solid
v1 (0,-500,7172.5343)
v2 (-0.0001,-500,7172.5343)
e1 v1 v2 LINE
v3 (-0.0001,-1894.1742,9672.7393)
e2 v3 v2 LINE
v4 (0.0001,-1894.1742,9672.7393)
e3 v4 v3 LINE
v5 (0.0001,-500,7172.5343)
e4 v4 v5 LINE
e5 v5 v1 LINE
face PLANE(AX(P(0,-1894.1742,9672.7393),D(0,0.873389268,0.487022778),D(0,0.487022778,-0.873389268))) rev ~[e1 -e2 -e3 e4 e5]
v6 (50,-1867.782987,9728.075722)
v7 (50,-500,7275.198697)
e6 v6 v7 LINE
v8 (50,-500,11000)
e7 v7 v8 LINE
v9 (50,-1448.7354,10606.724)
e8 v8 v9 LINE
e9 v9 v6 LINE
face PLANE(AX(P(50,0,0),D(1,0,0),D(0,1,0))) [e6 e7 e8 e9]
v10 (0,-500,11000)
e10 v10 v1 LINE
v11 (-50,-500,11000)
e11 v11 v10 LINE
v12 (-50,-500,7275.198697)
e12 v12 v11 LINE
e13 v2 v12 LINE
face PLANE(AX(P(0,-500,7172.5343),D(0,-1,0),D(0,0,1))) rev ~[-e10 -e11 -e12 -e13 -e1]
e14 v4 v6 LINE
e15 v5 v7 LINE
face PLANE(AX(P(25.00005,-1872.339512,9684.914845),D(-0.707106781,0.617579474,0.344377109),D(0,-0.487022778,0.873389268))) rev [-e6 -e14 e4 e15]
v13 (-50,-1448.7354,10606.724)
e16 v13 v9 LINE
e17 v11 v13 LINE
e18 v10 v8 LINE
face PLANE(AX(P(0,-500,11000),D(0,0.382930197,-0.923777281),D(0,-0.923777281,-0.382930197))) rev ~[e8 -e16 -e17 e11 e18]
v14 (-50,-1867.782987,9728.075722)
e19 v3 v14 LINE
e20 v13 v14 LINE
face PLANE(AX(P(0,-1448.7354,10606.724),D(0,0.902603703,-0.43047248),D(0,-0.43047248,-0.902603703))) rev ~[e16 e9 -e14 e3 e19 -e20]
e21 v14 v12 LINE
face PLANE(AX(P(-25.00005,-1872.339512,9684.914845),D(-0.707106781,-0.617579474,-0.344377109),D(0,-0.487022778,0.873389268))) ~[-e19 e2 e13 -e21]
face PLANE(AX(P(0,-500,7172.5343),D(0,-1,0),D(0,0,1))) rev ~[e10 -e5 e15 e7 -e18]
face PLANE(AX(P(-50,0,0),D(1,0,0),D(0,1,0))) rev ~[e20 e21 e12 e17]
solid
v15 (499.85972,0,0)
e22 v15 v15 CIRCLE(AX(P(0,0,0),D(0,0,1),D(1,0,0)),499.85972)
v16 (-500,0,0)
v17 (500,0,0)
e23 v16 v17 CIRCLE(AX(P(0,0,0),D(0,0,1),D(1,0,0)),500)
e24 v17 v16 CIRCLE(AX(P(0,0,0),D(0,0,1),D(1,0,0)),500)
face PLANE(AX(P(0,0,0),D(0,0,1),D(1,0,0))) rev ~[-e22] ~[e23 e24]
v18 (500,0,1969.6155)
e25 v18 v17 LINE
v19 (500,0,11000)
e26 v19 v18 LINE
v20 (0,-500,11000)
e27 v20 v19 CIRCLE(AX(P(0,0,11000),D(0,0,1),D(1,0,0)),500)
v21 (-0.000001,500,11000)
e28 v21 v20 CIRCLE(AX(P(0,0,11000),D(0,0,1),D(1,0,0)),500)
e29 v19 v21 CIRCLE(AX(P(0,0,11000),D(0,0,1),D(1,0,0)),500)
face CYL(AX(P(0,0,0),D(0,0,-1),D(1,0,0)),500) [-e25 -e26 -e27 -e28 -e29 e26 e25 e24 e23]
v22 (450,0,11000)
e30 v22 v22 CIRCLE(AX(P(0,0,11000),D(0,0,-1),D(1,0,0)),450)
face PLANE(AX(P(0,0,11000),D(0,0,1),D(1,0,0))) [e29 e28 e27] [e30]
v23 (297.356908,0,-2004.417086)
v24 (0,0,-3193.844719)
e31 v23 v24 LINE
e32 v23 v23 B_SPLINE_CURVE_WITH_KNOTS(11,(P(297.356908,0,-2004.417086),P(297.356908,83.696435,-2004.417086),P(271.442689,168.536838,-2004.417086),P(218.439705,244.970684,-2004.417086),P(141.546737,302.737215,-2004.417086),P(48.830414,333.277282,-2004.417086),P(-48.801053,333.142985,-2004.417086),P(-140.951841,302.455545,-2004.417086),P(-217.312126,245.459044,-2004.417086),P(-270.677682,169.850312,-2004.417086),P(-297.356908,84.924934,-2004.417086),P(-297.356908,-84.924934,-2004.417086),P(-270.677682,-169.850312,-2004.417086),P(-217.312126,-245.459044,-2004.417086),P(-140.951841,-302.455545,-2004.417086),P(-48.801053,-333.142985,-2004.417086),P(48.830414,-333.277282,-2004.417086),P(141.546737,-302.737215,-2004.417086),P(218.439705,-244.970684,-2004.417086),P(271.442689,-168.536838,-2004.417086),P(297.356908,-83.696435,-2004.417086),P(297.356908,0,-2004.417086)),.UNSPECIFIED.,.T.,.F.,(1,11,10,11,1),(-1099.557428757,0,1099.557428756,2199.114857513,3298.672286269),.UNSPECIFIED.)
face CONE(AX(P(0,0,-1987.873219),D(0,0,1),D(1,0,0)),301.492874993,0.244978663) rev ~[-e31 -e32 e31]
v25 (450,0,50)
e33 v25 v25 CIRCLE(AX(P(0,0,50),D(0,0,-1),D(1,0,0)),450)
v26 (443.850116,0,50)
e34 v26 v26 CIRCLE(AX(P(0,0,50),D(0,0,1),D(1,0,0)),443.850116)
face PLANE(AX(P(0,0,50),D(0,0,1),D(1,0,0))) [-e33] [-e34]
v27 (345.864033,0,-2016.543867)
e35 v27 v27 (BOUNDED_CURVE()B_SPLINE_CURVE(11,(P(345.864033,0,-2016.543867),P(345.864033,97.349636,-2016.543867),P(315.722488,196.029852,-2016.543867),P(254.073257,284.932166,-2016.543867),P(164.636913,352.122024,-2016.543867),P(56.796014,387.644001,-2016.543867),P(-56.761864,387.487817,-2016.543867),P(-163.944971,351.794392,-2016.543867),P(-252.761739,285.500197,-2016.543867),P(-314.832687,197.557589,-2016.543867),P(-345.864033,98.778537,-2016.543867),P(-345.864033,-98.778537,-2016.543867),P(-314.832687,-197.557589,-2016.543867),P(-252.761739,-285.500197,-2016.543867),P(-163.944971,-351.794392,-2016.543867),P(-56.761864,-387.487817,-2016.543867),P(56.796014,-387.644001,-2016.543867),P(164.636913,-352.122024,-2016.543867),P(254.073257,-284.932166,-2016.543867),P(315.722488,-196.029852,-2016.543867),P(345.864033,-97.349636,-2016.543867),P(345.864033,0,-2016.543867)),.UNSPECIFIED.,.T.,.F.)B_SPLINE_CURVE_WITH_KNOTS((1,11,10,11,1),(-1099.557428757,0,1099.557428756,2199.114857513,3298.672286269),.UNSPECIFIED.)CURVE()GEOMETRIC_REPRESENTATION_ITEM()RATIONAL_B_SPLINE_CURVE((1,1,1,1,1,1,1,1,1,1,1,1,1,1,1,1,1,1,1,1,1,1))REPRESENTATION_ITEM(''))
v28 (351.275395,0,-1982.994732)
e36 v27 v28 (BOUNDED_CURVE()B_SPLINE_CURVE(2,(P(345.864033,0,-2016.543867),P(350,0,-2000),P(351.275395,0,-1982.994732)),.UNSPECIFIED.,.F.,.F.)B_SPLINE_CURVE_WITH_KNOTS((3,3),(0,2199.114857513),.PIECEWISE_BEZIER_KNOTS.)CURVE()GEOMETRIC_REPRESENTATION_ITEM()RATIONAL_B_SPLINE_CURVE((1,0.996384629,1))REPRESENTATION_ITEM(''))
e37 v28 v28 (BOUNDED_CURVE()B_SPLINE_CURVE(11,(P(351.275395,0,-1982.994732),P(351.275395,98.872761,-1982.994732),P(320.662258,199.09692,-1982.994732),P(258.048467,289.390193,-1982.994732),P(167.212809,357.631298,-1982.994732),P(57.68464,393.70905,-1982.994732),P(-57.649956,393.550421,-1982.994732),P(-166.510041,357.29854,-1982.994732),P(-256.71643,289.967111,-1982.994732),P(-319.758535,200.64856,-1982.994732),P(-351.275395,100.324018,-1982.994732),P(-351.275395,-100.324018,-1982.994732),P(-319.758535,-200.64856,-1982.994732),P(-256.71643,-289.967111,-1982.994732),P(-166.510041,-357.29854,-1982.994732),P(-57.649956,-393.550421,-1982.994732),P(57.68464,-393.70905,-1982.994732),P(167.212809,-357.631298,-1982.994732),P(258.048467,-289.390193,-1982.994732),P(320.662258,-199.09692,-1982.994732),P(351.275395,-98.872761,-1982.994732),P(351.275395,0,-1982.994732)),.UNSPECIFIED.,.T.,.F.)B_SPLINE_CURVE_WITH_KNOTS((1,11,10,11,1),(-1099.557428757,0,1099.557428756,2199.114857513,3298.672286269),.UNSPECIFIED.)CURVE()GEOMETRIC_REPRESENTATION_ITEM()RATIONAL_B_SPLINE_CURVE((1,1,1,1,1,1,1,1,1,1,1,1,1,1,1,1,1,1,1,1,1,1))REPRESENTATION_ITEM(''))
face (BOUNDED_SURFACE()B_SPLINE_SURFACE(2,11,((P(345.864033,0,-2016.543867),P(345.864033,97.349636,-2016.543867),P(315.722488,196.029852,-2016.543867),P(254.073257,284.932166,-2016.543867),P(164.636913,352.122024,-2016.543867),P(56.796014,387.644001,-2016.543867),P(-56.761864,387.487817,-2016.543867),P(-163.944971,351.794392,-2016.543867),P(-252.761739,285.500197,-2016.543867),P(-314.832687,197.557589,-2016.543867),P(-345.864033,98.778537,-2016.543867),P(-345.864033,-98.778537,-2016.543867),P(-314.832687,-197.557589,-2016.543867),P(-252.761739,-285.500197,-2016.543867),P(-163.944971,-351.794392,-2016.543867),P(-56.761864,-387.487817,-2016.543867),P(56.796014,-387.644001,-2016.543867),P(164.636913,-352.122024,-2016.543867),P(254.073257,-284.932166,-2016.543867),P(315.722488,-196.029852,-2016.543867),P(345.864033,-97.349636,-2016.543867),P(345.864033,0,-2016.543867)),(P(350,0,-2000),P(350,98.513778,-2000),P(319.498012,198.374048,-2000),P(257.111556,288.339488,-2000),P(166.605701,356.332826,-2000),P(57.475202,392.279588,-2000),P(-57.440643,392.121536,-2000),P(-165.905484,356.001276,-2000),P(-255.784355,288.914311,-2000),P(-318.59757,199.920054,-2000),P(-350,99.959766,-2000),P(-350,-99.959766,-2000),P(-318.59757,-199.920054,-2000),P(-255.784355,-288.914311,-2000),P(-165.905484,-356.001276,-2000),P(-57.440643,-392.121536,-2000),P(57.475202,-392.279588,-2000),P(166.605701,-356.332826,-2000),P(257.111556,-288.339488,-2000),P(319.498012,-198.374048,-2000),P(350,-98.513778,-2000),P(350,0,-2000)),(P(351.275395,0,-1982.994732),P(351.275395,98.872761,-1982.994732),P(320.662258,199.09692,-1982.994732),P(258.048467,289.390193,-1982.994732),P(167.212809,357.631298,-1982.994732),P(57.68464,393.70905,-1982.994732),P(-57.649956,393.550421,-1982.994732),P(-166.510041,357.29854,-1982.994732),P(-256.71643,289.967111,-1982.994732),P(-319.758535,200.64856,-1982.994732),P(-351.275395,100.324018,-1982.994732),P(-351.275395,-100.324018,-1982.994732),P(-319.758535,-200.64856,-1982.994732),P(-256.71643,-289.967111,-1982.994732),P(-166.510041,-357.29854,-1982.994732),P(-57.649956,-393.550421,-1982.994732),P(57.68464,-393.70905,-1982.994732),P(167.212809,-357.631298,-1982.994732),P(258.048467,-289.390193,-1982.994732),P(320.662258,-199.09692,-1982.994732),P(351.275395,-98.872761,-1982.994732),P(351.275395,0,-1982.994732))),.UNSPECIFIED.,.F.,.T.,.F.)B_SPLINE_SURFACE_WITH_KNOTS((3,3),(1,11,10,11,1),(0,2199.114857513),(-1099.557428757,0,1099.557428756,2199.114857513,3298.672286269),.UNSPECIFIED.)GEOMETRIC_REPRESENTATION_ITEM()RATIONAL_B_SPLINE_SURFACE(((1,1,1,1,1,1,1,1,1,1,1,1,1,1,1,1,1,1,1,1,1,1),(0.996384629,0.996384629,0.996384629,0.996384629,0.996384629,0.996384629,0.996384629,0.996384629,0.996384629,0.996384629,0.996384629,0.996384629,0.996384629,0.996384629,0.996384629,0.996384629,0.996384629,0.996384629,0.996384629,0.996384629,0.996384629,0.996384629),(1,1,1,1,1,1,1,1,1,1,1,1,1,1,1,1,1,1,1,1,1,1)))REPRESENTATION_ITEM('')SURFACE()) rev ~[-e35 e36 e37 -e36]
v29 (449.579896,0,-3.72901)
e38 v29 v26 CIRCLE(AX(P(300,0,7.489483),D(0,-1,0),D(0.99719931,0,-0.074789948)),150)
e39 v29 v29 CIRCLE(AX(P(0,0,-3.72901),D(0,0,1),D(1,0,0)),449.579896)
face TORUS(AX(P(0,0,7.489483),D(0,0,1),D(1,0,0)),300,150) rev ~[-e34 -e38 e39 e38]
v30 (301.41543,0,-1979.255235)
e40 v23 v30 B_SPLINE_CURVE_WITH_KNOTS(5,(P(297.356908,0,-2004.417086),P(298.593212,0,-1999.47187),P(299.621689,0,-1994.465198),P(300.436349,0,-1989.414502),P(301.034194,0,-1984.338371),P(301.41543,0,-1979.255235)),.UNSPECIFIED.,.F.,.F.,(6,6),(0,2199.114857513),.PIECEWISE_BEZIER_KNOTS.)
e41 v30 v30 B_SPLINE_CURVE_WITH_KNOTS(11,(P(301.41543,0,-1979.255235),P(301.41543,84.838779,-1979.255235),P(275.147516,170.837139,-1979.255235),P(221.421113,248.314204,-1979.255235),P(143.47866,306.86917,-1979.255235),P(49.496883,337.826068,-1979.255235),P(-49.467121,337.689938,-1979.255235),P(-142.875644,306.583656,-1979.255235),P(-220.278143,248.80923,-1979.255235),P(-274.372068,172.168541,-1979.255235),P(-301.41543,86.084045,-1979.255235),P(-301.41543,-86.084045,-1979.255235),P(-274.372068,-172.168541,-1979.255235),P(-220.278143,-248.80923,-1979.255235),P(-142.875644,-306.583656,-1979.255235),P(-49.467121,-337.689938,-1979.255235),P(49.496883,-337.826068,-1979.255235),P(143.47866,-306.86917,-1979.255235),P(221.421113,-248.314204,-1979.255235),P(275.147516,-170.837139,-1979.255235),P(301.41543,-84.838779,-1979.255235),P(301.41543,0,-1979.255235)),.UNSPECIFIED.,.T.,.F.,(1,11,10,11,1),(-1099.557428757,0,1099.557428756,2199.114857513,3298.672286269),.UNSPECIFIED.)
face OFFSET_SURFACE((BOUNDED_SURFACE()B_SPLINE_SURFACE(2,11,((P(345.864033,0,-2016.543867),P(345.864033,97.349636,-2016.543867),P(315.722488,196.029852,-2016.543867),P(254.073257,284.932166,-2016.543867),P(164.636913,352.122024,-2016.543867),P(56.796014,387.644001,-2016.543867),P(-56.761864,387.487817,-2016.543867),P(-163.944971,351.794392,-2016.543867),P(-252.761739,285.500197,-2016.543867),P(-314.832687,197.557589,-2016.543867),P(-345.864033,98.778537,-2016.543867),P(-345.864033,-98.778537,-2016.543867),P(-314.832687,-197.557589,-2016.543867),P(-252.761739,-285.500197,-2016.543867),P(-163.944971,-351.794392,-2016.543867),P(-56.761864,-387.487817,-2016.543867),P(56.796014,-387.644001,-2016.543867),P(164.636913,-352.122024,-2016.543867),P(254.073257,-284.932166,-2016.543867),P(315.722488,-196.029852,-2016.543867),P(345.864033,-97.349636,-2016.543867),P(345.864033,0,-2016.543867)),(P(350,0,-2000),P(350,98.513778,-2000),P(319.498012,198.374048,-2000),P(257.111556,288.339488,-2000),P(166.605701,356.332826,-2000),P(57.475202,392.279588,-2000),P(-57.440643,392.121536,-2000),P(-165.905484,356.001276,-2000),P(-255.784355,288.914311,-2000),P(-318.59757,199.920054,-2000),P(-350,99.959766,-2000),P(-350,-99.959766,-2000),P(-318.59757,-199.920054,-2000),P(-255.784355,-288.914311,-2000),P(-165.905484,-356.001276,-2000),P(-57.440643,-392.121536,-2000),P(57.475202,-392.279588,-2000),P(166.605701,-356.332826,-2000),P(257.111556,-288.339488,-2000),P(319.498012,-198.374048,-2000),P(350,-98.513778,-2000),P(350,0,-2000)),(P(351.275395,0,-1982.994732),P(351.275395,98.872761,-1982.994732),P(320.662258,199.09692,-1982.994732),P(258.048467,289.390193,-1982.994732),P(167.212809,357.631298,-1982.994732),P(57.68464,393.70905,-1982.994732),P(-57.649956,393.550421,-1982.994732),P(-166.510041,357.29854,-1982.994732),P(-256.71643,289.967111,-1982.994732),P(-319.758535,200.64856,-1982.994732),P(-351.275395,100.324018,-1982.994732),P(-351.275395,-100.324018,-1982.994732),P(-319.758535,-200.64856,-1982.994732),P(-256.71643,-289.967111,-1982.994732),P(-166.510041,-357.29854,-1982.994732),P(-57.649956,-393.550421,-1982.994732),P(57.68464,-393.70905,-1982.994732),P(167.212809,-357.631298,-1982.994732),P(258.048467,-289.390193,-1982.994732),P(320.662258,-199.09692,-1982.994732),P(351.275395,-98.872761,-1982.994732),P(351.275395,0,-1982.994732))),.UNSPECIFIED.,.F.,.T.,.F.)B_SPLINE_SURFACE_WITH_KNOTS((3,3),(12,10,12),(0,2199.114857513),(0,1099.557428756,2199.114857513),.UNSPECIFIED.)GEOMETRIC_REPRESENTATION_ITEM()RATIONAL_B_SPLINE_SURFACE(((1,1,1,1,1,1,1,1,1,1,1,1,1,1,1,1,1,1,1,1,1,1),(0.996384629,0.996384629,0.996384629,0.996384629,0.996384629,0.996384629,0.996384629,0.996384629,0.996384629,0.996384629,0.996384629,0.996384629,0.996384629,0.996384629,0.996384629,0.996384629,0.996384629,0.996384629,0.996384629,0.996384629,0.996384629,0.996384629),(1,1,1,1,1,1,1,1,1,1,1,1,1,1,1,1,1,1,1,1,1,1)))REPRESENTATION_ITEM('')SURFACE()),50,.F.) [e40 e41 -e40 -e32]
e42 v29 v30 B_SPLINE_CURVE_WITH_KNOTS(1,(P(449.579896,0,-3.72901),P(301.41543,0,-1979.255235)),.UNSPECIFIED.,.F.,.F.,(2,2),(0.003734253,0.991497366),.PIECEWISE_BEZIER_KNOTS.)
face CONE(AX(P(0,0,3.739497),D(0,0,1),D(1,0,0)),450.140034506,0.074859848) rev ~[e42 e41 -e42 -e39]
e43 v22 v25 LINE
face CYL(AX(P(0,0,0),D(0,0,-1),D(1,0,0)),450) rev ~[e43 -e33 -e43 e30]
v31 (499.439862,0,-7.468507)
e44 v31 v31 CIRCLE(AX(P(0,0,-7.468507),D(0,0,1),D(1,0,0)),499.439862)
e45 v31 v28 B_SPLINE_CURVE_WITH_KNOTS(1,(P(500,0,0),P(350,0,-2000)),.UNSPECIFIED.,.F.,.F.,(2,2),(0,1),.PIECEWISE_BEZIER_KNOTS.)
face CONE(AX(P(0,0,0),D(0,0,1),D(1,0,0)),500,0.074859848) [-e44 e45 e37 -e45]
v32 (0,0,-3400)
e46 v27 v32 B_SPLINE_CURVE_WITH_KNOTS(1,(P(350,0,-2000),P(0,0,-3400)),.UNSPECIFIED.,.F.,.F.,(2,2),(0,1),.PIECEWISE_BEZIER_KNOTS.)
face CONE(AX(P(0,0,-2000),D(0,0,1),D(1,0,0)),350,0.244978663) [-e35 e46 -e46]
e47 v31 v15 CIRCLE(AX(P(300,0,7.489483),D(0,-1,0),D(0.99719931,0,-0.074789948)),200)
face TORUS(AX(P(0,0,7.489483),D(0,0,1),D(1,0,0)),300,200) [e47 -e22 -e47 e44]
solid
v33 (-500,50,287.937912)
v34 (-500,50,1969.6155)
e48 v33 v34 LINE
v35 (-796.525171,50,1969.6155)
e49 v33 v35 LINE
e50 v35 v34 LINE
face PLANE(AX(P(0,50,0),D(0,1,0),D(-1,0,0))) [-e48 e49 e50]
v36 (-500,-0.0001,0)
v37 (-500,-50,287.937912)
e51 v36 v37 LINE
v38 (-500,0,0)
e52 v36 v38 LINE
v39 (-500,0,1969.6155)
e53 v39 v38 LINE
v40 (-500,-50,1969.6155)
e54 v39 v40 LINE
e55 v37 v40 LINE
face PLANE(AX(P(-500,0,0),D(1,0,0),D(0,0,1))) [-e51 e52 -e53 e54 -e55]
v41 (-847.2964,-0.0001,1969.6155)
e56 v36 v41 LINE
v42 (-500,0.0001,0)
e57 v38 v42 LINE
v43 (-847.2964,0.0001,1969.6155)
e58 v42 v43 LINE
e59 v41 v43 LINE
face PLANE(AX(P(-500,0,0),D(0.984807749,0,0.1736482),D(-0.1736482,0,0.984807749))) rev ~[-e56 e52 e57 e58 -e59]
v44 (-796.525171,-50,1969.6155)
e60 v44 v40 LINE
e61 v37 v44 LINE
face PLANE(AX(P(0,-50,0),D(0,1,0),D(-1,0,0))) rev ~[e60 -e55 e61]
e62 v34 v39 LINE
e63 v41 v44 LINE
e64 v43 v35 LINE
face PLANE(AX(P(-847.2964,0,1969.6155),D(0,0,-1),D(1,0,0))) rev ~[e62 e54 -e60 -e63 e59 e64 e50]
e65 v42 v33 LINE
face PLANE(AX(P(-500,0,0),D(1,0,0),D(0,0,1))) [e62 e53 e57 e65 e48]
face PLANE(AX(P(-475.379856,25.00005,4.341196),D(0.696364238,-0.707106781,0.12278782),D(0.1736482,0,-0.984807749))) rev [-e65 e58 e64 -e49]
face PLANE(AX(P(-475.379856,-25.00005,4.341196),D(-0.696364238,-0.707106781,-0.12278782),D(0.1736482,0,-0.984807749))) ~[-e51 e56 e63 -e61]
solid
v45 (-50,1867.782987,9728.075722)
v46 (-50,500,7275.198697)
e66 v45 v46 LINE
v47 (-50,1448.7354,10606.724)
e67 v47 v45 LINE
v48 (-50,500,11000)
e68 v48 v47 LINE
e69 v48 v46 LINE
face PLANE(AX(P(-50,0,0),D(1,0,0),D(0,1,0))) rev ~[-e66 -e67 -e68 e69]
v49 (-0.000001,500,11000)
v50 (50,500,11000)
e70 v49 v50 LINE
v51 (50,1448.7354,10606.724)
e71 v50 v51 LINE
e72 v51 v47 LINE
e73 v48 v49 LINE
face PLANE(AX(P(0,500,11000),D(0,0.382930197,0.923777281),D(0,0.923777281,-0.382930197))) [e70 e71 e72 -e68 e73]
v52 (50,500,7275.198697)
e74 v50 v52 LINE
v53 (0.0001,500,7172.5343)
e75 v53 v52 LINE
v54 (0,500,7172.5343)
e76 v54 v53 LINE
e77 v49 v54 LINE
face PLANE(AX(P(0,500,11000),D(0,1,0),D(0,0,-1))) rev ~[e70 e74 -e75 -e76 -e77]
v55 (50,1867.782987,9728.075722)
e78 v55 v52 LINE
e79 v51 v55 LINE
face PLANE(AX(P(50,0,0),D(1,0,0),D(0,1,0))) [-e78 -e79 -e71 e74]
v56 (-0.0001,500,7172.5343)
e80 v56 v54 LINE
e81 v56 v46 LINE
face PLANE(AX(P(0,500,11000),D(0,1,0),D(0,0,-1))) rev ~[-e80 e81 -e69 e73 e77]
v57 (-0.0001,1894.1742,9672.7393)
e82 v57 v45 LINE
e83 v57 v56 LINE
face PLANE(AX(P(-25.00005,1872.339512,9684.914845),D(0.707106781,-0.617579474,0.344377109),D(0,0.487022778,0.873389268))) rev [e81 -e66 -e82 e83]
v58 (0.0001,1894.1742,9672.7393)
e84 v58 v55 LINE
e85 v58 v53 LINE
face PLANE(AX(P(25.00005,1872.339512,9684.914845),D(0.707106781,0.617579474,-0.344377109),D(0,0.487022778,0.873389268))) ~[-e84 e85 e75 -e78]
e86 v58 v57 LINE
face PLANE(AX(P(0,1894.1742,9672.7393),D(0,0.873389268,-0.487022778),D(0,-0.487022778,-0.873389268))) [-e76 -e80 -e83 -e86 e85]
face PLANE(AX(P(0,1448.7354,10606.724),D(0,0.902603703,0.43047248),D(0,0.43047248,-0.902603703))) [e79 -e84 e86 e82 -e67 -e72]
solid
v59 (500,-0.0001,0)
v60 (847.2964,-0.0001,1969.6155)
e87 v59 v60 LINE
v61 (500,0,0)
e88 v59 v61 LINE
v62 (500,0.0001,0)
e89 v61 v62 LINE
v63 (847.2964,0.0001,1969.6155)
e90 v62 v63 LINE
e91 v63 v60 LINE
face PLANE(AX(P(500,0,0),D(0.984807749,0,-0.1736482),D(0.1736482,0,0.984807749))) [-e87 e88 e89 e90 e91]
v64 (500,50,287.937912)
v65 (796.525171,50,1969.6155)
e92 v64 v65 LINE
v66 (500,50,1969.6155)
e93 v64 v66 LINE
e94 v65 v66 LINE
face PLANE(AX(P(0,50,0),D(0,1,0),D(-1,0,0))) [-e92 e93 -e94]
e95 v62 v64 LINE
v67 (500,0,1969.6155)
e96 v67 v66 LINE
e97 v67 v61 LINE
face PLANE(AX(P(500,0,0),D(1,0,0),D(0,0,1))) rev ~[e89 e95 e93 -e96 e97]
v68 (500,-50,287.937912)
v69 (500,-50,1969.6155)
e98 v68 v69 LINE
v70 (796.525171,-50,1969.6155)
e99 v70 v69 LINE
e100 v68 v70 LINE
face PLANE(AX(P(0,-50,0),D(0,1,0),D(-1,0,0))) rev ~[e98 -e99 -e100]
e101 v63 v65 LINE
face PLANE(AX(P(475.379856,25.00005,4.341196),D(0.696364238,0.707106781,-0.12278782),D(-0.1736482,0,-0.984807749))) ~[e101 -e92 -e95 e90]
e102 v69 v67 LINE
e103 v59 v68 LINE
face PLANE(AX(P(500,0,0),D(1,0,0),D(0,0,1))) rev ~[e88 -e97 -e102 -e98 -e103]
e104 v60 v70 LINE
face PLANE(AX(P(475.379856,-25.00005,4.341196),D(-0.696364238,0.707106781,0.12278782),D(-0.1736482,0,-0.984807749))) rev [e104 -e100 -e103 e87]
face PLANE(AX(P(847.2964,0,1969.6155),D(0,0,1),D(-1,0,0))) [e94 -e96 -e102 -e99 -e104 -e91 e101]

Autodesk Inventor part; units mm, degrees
ref_plane "YZ Plane" through (0, 0, 0) normal (1, 0, 0) x (0, 1, 0)
sketch "Sketch1" plane through (0, 0, 0) normal (0, 0, 1) x (1, 0, 0)
  circle A0 centre (0, 0) radius 500
  dimension "d0" = 1000
ref_plane "Work Plane1" through (0, 0, -2000) normal (0, 0, 1) x (1, 0, 0)
sketch "Sketch2" plane through (0, 0, -2000) normal (0, 0, 1) x (1, 0, 0)
  circle A0 centre (0, 0) radius 350
  dimension "d2" = 700
extrude "Extrusion1" add sketch "Sketch1" along normal blind 3000
loft "Loft1" add profiles "Sketch2" section 1 edges at (-500, 0, 0)
fillet "Fillet1" radius 200 1 edges at (-500, 0, 0)
ref_plane "Work Plane2" through (0, 0, -3400) normal (0, 0, -1) x (-1, 0, 0)
sketch "Sketch3" plane through (0, 0, -3400) normal (0, 0, -1) x (-1, 0, 0)
  point P0 (0, 0)
  point P1 (0, 0)
loft "Loft2" add section 1 edges at (-350, 0, -2000) section 2 point at (0, 0, -3400)
fillet "Fillet2" radius 200 1 edges at (-350, 0, -2000)
extrude "Extrusion2" add sketch "Sketch1" along normal blind 11000
shell "Shell1" thickness 50 removed faces 1 at (-105.6691, 12.3701, 11000)
sketch "Sketch4" plane through (0, 0, 0) normal (1, 0, 0) x (0, 1, 0)
  line L0 (500, 11000) -> (-500, 11000) projected
  line L1 (-500, 11000) -> (-1448.7354, 10606.724)
  line L2 (-1448.7354, 10606.724) -> (-1894.1742, 9672.7393)
  line L3 (-1894.1742, 9672.7393) -> (-500, 7172.5343)
  line L4 (-500, 0) -> (-500, 11000) projected
  line L5 (-500, 7172.5343) -> (-500, 11000)
  line L6 (500, 11000) -> (1448.7354, 10606.724)
  line L7 (1448.7354, 10606.724) -> (1894.1742, 9672.7393)
  line L8 (1894.1742, 9672.7393) -> (500, 7172.5343)
  line L9 (500, 11000) -> (500, 7172.5343)
  line L10 (500, 0) -> (500, 11000) projected
  point P0 (0, 0)
extrude "Extrusion3" add sketch "Sketch4" along normal mid plane 100
chamfer "Chamfer1" distance 50 angle 45 2 edges at (-50, 1197.0871, 8422.6368) (50, 1197.0871, 8422.6368)
chamfer "Chamfer2" distance 50 angle 45 2 edges at (50, -1197.0871, 8422.6368) (-50, -1197.0871, 8422.6368)
sketch "Sketch5" plane through (0, 0, 0) normal (0, 1, 0) x (-1, 0, 0)
  line L0 (-500, 0) -> (500, 0) projected
  line L1 (500, 0) -> (847.2964, 1969.6155)
  line L2 (500, 0) -> (2500, 0) construction
  line L3 (847.2964, 1969.6155) -> (500, 1969.6155)
  line L4 (500, 0) -> (500, 11000) projected
  line L5 (500, 0) -> (500, 1969.6155)
  line L6 (450, 50) -> (450, 11000) projected
  line L7 (0, -4841.3947) -> (0, -4440.4858)
  line L8 (-500, 0) -> (-847.2964, 1969.6155)
  line L9 (-847.2964, 1969.6155) -> (-500, 1969.6155)
  line L10 (-500, 0) -> (-500, 1969.6155)
  line L11 (-450, 50) -> (-450, 11000) projected
  point P0 (0, 0)
  dimension "d27" = 2000
  dimension "d28" = 80
extrude "Extrusion4" add sketch "Sketch5" along normal mid plane 100
chamfer "Chamfer3" distance 50 angle 45 4 edges at (-673.6482, -50, 984.8078) (-673.6482, 50, 984.8078) (673.6482, -50, 984.8078) (673.6482, 50, 984.8078)
properties part number "missle"
